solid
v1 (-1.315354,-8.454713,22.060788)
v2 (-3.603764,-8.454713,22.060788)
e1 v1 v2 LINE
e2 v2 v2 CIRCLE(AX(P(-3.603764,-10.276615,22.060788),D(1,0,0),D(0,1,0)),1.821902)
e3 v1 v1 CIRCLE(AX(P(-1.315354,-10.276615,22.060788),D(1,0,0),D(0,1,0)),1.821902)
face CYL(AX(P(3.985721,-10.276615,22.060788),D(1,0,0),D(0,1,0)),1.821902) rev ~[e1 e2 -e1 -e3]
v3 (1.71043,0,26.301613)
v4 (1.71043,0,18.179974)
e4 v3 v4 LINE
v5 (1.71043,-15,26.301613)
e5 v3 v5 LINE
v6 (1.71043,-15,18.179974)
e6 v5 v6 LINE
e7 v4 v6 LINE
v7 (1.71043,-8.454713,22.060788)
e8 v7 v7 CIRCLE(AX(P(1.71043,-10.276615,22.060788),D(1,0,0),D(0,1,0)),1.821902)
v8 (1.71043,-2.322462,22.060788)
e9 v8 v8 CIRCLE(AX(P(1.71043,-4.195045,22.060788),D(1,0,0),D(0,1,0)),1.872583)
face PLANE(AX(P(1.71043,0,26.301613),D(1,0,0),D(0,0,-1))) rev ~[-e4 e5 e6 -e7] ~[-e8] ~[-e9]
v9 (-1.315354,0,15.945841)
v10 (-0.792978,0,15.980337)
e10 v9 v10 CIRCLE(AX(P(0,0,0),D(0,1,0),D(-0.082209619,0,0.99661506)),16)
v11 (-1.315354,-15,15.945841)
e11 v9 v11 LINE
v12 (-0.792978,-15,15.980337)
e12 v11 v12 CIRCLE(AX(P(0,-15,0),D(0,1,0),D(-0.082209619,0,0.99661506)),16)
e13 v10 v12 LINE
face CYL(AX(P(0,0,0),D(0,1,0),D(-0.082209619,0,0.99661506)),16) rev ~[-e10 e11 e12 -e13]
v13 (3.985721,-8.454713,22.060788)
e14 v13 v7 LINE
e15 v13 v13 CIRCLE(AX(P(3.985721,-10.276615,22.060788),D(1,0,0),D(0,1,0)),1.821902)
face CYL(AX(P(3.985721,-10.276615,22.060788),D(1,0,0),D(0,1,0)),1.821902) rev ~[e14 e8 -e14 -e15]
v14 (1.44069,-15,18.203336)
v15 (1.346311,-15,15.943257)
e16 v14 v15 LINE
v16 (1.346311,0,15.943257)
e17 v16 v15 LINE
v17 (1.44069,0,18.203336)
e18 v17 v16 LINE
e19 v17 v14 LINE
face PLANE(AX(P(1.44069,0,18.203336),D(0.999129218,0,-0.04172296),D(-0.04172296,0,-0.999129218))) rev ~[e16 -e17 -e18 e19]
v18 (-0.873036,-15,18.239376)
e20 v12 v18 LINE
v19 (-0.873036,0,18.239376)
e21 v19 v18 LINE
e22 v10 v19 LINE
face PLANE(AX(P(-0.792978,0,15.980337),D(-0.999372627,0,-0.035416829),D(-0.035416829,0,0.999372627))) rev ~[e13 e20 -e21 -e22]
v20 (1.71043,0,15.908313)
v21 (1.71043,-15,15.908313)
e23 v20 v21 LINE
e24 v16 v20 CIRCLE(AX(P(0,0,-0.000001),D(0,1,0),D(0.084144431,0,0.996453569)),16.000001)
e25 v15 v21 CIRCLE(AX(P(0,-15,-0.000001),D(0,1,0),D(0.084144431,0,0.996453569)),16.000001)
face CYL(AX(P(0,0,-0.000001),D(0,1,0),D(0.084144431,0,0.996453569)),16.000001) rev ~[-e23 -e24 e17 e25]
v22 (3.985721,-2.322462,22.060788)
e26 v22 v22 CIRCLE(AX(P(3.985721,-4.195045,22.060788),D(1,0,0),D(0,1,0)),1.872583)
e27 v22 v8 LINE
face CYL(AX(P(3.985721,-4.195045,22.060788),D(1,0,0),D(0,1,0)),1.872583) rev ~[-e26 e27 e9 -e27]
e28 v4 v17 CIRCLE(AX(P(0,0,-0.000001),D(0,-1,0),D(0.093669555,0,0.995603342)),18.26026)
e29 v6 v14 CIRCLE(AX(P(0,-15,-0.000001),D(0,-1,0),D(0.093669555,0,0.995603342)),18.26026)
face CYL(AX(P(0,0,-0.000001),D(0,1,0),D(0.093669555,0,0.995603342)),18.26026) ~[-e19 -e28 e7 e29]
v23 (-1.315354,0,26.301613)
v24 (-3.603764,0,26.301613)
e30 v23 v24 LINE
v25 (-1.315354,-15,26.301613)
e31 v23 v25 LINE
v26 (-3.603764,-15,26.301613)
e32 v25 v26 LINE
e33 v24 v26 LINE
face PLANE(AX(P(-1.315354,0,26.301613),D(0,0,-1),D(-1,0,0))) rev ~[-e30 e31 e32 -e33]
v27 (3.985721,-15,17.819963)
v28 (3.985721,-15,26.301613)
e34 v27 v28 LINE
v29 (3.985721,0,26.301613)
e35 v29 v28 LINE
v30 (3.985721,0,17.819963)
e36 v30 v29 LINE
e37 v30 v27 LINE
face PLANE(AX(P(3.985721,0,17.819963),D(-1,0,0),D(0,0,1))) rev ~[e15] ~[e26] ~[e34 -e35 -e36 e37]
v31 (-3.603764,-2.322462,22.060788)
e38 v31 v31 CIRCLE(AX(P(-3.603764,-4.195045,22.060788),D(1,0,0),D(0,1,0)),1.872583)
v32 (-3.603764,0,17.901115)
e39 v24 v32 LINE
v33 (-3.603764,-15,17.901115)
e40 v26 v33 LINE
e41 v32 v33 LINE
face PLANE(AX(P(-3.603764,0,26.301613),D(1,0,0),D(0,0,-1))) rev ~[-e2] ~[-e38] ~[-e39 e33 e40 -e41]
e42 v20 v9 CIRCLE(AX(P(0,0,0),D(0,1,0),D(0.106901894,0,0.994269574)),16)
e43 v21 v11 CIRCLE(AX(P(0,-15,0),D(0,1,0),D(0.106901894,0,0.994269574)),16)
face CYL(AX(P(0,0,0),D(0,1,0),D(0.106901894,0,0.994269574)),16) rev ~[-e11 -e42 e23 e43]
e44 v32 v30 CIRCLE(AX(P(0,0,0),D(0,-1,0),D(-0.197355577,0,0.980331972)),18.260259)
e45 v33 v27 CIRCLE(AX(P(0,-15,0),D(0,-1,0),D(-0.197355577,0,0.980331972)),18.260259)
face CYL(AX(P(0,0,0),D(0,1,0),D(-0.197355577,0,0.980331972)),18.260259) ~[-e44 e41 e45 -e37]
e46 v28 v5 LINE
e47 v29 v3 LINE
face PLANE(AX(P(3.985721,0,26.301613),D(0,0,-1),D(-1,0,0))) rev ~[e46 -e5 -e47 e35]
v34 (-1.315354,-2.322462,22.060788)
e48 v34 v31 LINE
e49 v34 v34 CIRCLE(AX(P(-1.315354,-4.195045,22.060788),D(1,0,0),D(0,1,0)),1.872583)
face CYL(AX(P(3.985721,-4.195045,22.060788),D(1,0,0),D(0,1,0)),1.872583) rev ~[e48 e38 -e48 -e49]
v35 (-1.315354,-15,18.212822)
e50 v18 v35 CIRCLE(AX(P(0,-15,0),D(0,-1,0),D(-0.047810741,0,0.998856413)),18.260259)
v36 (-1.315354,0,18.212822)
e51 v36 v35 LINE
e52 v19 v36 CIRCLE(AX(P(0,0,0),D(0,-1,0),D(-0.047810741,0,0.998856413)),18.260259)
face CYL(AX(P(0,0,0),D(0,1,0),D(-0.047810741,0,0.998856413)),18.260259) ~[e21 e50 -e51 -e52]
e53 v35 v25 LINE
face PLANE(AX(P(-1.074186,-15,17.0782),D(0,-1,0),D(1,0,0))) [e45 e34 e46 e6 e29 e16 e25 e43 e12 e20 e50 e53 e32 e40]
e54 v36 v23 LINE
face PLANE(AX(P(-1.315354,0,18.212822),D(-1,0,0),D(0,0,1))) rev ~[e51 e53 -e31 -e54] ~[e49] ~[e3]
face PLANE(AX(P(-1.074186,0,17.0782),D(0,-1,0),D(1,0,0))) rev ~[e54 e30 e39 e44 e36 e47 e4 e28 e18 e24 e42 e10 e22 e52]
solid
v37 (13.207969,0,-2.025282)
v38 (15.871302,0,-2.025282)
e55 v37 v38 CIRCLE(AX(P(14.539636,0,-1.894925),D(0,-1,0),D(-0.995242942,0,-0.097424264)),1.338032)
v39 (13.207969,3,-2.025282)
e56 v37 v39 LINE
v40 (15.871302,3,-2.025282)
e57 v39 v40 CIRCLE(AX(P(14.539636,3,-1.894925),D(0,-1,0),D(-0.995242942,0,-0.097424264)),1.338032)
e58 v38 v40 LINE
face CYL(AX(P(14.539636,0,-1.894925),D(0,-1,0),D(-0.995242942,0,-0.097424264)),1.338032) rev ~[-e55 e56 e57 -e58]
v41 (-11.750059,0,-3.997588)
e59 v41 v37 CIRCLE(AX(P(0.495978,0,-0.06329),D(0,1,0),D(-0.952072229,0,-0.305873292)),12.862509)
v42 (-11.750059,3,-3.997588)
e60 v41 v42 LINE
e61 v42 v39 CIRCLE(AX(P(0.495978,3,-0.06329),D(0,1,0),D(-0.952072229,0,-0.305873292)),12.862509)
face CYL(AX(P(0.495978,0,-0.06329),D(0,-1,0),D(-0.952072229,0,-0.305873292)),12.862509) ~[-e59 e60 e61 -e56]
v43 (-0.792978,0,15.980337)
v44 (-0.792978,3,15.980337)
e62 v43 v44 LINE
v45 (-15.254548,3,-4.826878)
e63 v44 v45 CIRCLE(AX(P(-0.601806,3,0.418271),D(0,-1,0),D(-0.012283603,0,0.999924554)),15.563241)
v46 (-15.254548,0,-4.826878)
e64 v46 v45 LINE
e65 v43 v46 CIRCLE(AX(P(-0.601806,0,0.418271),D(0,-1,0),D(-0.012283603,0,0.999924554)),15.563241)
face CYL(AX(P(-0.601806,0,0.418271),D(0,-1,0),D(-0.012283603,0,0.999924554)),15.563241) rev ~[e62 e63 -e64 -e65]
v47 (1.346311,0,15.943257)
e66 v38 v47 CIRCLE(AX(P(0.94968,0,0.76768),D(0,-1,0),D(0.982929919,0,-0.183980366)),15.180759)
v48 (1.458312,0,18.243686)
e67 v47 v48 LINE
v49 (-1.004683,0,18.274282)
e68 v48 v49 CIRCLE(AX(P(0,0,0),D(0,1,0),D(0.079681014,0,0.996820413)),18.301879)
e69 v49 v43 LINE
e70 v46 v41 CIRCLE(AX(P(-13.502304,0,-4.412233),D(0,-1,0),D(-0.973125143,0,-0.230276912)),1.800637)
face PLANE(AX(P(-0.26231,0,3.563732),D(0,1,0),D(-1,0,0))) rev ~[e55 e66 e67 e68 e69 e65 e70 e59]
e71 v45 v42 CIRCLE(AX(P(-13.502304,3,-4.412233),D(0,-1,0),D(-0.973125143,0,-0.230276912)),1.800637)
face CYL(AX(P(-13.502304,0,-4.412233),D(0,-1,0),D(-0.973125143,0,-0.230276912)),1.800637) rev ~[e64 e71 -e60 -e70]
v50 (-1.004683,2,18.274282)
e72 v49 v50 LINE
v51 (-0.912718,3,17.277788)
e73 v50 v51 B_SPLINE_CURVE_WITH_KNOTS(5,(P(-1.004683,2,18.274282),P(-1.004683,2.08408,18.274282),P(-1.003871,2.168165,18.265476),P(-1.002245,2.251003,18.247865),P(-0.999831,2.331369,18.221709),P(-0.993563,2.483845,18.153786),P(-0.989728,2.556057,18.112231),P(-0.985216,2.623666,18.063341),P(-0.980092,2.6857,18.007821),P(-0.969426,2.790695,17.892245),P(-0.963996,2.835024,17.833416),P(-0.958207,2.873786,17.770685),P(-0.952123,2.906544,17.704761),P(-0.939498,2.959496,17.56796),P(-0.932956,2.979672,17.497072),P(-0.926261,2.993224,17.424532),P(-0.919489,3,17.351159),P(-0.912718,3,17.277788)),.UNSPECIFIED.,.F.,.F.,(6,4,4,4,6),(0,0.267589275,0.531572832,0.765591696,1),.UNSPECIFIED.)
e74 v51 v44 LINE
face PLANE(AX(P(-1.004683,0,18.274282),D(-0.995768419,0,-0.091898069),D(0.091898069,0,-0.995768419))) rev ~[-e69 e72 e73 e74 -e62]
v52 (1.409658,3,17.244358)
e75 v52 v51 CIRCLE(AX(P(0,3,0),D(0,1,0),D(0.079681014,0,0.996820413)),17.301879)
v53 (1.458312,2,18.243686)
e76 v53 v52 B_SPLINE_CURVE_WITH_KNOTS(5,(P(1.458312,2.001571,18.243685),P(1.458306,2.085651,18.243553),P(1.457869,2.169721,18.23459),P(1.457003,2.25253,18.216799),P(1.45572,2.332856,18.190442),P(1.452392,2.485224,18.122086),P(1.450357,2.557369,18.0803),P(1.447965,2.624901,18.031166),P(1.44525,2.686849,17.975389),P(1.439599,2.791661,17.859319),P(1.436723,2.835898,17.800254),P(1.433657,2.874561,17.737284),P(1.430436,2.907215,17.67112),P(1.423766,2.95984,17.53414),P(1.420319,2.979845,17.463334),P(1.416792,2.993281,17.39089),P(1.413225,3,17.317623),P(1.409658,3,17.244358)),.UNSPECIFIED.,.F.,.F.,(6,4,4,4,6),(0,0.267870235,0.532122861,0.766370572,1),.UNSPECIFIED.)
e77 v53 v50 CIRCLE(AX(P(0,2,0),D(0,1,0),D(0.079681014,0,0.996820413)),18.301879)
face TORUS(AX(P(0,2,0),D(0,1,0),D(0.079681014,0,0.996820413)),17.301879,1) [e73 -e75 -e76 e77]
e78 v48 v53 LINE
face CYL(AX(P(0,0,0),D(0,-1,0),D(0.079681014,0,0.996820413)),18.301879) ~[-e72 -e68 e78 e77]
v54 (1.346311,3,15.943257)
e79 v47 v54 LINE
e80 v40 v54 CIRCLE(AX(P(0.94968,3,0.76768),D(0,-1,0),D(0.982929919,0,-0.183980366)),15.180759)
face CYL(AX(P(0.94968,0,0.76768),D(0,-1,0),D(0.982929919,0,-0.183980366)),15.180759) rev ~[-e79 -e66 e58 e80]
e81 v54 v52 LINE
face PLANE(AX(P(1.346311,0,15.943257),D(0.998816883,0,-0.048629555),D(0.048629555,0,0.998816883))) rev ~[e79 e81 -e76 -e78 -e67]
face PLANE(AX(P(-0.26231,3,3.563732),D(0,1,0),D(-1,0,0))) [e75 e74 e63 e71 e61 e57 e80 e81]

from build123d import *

# Parameters (mm, degrees)
F1_DEPTH = 15
F3_DEPTH = 3
F4_R     = 1
F5_R     = 1.821901794
F5_R_2   = 1.8725831309
F6_DEPTH = 25


with BuildPart() as f1:
    # F0 (on Front) → F1 (new body)
    with BuildSketch(Plane.XZ):
        with BuildLine():
            ThreePointArc((-1.3153538917, 15.9458409668), (-1.0543071799, 15.9652258478), (-0.7929782714, 15.9803374639))
            Line((-0.7929782714, 15.9803374639), (-0.8730364945, 18.2393764119))
            ThreePointArc((-0.8730364945, 18.2393764119), (-1.0942757438, 18.2274409946), (-1.3153538917, 18.2128220975))
            Line((-1.3153538917, 18.2128220975), (-1.3153538917, 15.9458409668))
        make_face()
        with BuildLine():
            ThreePointArc((1.710430308, 15.9083131778), (-0.1984273858, -15.9987695331), (-1.3153538917, 15.9458409668))
            Line((-1.3153538917, 15.9458409668), (-3.6037638783, 15.9458409668))
            Line((-3.6037638783, 15.9458409668), (-3.6037638783, 17.901115343))
            ThreePointArc((-3.6037638783, 17.901115343), (-0.1952417623, -18.2592148043), (3.9857214978, 17.8199626475))
            Line((3.9857214978, 17.8199626475), (3.9857214978, 15.9083131778))
            Line((3.9857214978, 15.9083131778), (1.710430308, 15.9083131778))
        make_face()
        with BuildLine():
            Line((-3.6037638783, 15.9458409668), (-1.3153538917, 15.9458409668))
            Line((-1.3153538917, 15.9458409668), (-1.3153538917, 18.2128220975))
            ThreePointArc((-1.3153538917, 18.2128220975), (-2.4644918714, 18.0931844746), (-3.6037638783, 17.901115343))
            Line((-3.6037638783, 17.901115343), (-3.6037638783, 15.9458409668))
        make_face()
        with BuildLine():
            Line((1.710430308, 18.1799744988), (1.710430308, 15.9083131778))
            Line((1.710430308, 15.9083131778), (3.9857214978, 15.9083131778))
            Line((3.9857214978, 15.9083131778), (3.9857214978, 17.8199626475))
            ThreePointArc((3.9857214978, 17.8199626475), (2.8537586587, 18.0358838467), (1.710430308, 18.1799744988))
        make_face()
        with BuildLine():
            ThreePointArc((1.3463109011, 15.9432571), (1.5284704689, 15.926825736), (1.710430308, 15.9083131778))
            Line((1.710430308, 15.9083131778), (1.710430308, 18.1799744988))
            ThreePointArc((1.710430308, 18.1799744988), (1.5756035958, 18.1921553952), (1.4406902841, 18.2033364008))
            Line((1.4406902841, 18.2033364008), (1.3463109011, 15.9432571))
        make_face()
        with BuildLine():
            ThreePointArc((-3.6037638783, 17.901115343), (-2.4644918714, 18.0931844746), (-1.3153538917, 18.2128220975))
            Line((-1.3153538917, 18.2128220975), (-1.3153538917, 26.3016127771))
            Line((-1.3153538917, 26.3016127771), (-3.6037638783, 26.3016127771))
            Line((-3.6037638783, 26.3016127771), (-3.6037638783, 17.901115343))
        make_face()
        with BuildLine():
            Line((1.710430308, 26.3016127771), (1.710430308, 18.1799744988))
            ThreePointArc((1.710430308, 18.1799744988), (2.8537586587, 18.0358838467), (3.9857214978, 17.8199626475))
            Line((3.9857214978, 17.8199626475), (3.9857214978, 26.3016127771))
            Line((3.9857214978, 26.3016127771), (1.710430308, 26.3016127771))
        make_face()
    extrude(amount=F1_DEPTH)

    # F5 (on face) → F6 (cut)
    with BuildSketch(Plane.YZ.offset(3.9857214978)):
        with Locations((-10.2766146883, 22.0607877123)):
            Circle(F5_R)
        with Locations((-4.1950447485, 22.0607877123)):
            Circle(F5_R_2)
    extrude(amount=-F6_DEPTH, mode=Mode.SUBTRACT)


with BuildPart() as f3:
    # F2 (on face) → F3 (new body)
    with BuildSketch(Plane(origin=(0, 0, 0), x_dir=(-1, 0, 0), z_dir=(0, 1, 0))):
        with BuildLine():
            ThreePointArc((15.254548473, -4.8268779645), (13.0876587907, -6.1644776131), (11.7500591421, -3.9975879308))
            ThreePointArc((11.7500591421, -3.9975879308), (0.5173215514, 12.7592430058), (-13.2079693725, -2.0252815342))
            ThreePointArc((-13.2079693725, -2.0252815342), (-14.5396358049, -3.2329563244), (-15.8713022373, -2.0252815342))
            ThreePointArc((-15.8713022373, -2.0252815342), (-12.7555816036, 10.3110617982), (-1.3463109011, 15.9432571))
            Line((-1.3463109011, 15.9432571), (-1.4583122663, 18.2436864304))
            ThreePointArc((-1.4583122663, 18.2436864304), (0.2273298413, -18.3004669443), (1.0046831878, 18.2742819538))
            Line((1.0046831878, 18.2742819538), (0.7929782714, 15.9803374639))
            ThreePointArc((0.7929782714, 15.9803374639), (13.3814969398, 9.3004976117), (15.254548473, -4.8268779645))
        make_face()
    extrude(amount=F3_DEPTH)

    # F4
    f4_edges = [f3.edges().sort_by_distance(p)[0] for p in [
        (-0.22733, 3, -18.300467),
    ]]
    fillet(f4_edges, radius=F4_R)


solid = Compound([f1.part, f3.part])
